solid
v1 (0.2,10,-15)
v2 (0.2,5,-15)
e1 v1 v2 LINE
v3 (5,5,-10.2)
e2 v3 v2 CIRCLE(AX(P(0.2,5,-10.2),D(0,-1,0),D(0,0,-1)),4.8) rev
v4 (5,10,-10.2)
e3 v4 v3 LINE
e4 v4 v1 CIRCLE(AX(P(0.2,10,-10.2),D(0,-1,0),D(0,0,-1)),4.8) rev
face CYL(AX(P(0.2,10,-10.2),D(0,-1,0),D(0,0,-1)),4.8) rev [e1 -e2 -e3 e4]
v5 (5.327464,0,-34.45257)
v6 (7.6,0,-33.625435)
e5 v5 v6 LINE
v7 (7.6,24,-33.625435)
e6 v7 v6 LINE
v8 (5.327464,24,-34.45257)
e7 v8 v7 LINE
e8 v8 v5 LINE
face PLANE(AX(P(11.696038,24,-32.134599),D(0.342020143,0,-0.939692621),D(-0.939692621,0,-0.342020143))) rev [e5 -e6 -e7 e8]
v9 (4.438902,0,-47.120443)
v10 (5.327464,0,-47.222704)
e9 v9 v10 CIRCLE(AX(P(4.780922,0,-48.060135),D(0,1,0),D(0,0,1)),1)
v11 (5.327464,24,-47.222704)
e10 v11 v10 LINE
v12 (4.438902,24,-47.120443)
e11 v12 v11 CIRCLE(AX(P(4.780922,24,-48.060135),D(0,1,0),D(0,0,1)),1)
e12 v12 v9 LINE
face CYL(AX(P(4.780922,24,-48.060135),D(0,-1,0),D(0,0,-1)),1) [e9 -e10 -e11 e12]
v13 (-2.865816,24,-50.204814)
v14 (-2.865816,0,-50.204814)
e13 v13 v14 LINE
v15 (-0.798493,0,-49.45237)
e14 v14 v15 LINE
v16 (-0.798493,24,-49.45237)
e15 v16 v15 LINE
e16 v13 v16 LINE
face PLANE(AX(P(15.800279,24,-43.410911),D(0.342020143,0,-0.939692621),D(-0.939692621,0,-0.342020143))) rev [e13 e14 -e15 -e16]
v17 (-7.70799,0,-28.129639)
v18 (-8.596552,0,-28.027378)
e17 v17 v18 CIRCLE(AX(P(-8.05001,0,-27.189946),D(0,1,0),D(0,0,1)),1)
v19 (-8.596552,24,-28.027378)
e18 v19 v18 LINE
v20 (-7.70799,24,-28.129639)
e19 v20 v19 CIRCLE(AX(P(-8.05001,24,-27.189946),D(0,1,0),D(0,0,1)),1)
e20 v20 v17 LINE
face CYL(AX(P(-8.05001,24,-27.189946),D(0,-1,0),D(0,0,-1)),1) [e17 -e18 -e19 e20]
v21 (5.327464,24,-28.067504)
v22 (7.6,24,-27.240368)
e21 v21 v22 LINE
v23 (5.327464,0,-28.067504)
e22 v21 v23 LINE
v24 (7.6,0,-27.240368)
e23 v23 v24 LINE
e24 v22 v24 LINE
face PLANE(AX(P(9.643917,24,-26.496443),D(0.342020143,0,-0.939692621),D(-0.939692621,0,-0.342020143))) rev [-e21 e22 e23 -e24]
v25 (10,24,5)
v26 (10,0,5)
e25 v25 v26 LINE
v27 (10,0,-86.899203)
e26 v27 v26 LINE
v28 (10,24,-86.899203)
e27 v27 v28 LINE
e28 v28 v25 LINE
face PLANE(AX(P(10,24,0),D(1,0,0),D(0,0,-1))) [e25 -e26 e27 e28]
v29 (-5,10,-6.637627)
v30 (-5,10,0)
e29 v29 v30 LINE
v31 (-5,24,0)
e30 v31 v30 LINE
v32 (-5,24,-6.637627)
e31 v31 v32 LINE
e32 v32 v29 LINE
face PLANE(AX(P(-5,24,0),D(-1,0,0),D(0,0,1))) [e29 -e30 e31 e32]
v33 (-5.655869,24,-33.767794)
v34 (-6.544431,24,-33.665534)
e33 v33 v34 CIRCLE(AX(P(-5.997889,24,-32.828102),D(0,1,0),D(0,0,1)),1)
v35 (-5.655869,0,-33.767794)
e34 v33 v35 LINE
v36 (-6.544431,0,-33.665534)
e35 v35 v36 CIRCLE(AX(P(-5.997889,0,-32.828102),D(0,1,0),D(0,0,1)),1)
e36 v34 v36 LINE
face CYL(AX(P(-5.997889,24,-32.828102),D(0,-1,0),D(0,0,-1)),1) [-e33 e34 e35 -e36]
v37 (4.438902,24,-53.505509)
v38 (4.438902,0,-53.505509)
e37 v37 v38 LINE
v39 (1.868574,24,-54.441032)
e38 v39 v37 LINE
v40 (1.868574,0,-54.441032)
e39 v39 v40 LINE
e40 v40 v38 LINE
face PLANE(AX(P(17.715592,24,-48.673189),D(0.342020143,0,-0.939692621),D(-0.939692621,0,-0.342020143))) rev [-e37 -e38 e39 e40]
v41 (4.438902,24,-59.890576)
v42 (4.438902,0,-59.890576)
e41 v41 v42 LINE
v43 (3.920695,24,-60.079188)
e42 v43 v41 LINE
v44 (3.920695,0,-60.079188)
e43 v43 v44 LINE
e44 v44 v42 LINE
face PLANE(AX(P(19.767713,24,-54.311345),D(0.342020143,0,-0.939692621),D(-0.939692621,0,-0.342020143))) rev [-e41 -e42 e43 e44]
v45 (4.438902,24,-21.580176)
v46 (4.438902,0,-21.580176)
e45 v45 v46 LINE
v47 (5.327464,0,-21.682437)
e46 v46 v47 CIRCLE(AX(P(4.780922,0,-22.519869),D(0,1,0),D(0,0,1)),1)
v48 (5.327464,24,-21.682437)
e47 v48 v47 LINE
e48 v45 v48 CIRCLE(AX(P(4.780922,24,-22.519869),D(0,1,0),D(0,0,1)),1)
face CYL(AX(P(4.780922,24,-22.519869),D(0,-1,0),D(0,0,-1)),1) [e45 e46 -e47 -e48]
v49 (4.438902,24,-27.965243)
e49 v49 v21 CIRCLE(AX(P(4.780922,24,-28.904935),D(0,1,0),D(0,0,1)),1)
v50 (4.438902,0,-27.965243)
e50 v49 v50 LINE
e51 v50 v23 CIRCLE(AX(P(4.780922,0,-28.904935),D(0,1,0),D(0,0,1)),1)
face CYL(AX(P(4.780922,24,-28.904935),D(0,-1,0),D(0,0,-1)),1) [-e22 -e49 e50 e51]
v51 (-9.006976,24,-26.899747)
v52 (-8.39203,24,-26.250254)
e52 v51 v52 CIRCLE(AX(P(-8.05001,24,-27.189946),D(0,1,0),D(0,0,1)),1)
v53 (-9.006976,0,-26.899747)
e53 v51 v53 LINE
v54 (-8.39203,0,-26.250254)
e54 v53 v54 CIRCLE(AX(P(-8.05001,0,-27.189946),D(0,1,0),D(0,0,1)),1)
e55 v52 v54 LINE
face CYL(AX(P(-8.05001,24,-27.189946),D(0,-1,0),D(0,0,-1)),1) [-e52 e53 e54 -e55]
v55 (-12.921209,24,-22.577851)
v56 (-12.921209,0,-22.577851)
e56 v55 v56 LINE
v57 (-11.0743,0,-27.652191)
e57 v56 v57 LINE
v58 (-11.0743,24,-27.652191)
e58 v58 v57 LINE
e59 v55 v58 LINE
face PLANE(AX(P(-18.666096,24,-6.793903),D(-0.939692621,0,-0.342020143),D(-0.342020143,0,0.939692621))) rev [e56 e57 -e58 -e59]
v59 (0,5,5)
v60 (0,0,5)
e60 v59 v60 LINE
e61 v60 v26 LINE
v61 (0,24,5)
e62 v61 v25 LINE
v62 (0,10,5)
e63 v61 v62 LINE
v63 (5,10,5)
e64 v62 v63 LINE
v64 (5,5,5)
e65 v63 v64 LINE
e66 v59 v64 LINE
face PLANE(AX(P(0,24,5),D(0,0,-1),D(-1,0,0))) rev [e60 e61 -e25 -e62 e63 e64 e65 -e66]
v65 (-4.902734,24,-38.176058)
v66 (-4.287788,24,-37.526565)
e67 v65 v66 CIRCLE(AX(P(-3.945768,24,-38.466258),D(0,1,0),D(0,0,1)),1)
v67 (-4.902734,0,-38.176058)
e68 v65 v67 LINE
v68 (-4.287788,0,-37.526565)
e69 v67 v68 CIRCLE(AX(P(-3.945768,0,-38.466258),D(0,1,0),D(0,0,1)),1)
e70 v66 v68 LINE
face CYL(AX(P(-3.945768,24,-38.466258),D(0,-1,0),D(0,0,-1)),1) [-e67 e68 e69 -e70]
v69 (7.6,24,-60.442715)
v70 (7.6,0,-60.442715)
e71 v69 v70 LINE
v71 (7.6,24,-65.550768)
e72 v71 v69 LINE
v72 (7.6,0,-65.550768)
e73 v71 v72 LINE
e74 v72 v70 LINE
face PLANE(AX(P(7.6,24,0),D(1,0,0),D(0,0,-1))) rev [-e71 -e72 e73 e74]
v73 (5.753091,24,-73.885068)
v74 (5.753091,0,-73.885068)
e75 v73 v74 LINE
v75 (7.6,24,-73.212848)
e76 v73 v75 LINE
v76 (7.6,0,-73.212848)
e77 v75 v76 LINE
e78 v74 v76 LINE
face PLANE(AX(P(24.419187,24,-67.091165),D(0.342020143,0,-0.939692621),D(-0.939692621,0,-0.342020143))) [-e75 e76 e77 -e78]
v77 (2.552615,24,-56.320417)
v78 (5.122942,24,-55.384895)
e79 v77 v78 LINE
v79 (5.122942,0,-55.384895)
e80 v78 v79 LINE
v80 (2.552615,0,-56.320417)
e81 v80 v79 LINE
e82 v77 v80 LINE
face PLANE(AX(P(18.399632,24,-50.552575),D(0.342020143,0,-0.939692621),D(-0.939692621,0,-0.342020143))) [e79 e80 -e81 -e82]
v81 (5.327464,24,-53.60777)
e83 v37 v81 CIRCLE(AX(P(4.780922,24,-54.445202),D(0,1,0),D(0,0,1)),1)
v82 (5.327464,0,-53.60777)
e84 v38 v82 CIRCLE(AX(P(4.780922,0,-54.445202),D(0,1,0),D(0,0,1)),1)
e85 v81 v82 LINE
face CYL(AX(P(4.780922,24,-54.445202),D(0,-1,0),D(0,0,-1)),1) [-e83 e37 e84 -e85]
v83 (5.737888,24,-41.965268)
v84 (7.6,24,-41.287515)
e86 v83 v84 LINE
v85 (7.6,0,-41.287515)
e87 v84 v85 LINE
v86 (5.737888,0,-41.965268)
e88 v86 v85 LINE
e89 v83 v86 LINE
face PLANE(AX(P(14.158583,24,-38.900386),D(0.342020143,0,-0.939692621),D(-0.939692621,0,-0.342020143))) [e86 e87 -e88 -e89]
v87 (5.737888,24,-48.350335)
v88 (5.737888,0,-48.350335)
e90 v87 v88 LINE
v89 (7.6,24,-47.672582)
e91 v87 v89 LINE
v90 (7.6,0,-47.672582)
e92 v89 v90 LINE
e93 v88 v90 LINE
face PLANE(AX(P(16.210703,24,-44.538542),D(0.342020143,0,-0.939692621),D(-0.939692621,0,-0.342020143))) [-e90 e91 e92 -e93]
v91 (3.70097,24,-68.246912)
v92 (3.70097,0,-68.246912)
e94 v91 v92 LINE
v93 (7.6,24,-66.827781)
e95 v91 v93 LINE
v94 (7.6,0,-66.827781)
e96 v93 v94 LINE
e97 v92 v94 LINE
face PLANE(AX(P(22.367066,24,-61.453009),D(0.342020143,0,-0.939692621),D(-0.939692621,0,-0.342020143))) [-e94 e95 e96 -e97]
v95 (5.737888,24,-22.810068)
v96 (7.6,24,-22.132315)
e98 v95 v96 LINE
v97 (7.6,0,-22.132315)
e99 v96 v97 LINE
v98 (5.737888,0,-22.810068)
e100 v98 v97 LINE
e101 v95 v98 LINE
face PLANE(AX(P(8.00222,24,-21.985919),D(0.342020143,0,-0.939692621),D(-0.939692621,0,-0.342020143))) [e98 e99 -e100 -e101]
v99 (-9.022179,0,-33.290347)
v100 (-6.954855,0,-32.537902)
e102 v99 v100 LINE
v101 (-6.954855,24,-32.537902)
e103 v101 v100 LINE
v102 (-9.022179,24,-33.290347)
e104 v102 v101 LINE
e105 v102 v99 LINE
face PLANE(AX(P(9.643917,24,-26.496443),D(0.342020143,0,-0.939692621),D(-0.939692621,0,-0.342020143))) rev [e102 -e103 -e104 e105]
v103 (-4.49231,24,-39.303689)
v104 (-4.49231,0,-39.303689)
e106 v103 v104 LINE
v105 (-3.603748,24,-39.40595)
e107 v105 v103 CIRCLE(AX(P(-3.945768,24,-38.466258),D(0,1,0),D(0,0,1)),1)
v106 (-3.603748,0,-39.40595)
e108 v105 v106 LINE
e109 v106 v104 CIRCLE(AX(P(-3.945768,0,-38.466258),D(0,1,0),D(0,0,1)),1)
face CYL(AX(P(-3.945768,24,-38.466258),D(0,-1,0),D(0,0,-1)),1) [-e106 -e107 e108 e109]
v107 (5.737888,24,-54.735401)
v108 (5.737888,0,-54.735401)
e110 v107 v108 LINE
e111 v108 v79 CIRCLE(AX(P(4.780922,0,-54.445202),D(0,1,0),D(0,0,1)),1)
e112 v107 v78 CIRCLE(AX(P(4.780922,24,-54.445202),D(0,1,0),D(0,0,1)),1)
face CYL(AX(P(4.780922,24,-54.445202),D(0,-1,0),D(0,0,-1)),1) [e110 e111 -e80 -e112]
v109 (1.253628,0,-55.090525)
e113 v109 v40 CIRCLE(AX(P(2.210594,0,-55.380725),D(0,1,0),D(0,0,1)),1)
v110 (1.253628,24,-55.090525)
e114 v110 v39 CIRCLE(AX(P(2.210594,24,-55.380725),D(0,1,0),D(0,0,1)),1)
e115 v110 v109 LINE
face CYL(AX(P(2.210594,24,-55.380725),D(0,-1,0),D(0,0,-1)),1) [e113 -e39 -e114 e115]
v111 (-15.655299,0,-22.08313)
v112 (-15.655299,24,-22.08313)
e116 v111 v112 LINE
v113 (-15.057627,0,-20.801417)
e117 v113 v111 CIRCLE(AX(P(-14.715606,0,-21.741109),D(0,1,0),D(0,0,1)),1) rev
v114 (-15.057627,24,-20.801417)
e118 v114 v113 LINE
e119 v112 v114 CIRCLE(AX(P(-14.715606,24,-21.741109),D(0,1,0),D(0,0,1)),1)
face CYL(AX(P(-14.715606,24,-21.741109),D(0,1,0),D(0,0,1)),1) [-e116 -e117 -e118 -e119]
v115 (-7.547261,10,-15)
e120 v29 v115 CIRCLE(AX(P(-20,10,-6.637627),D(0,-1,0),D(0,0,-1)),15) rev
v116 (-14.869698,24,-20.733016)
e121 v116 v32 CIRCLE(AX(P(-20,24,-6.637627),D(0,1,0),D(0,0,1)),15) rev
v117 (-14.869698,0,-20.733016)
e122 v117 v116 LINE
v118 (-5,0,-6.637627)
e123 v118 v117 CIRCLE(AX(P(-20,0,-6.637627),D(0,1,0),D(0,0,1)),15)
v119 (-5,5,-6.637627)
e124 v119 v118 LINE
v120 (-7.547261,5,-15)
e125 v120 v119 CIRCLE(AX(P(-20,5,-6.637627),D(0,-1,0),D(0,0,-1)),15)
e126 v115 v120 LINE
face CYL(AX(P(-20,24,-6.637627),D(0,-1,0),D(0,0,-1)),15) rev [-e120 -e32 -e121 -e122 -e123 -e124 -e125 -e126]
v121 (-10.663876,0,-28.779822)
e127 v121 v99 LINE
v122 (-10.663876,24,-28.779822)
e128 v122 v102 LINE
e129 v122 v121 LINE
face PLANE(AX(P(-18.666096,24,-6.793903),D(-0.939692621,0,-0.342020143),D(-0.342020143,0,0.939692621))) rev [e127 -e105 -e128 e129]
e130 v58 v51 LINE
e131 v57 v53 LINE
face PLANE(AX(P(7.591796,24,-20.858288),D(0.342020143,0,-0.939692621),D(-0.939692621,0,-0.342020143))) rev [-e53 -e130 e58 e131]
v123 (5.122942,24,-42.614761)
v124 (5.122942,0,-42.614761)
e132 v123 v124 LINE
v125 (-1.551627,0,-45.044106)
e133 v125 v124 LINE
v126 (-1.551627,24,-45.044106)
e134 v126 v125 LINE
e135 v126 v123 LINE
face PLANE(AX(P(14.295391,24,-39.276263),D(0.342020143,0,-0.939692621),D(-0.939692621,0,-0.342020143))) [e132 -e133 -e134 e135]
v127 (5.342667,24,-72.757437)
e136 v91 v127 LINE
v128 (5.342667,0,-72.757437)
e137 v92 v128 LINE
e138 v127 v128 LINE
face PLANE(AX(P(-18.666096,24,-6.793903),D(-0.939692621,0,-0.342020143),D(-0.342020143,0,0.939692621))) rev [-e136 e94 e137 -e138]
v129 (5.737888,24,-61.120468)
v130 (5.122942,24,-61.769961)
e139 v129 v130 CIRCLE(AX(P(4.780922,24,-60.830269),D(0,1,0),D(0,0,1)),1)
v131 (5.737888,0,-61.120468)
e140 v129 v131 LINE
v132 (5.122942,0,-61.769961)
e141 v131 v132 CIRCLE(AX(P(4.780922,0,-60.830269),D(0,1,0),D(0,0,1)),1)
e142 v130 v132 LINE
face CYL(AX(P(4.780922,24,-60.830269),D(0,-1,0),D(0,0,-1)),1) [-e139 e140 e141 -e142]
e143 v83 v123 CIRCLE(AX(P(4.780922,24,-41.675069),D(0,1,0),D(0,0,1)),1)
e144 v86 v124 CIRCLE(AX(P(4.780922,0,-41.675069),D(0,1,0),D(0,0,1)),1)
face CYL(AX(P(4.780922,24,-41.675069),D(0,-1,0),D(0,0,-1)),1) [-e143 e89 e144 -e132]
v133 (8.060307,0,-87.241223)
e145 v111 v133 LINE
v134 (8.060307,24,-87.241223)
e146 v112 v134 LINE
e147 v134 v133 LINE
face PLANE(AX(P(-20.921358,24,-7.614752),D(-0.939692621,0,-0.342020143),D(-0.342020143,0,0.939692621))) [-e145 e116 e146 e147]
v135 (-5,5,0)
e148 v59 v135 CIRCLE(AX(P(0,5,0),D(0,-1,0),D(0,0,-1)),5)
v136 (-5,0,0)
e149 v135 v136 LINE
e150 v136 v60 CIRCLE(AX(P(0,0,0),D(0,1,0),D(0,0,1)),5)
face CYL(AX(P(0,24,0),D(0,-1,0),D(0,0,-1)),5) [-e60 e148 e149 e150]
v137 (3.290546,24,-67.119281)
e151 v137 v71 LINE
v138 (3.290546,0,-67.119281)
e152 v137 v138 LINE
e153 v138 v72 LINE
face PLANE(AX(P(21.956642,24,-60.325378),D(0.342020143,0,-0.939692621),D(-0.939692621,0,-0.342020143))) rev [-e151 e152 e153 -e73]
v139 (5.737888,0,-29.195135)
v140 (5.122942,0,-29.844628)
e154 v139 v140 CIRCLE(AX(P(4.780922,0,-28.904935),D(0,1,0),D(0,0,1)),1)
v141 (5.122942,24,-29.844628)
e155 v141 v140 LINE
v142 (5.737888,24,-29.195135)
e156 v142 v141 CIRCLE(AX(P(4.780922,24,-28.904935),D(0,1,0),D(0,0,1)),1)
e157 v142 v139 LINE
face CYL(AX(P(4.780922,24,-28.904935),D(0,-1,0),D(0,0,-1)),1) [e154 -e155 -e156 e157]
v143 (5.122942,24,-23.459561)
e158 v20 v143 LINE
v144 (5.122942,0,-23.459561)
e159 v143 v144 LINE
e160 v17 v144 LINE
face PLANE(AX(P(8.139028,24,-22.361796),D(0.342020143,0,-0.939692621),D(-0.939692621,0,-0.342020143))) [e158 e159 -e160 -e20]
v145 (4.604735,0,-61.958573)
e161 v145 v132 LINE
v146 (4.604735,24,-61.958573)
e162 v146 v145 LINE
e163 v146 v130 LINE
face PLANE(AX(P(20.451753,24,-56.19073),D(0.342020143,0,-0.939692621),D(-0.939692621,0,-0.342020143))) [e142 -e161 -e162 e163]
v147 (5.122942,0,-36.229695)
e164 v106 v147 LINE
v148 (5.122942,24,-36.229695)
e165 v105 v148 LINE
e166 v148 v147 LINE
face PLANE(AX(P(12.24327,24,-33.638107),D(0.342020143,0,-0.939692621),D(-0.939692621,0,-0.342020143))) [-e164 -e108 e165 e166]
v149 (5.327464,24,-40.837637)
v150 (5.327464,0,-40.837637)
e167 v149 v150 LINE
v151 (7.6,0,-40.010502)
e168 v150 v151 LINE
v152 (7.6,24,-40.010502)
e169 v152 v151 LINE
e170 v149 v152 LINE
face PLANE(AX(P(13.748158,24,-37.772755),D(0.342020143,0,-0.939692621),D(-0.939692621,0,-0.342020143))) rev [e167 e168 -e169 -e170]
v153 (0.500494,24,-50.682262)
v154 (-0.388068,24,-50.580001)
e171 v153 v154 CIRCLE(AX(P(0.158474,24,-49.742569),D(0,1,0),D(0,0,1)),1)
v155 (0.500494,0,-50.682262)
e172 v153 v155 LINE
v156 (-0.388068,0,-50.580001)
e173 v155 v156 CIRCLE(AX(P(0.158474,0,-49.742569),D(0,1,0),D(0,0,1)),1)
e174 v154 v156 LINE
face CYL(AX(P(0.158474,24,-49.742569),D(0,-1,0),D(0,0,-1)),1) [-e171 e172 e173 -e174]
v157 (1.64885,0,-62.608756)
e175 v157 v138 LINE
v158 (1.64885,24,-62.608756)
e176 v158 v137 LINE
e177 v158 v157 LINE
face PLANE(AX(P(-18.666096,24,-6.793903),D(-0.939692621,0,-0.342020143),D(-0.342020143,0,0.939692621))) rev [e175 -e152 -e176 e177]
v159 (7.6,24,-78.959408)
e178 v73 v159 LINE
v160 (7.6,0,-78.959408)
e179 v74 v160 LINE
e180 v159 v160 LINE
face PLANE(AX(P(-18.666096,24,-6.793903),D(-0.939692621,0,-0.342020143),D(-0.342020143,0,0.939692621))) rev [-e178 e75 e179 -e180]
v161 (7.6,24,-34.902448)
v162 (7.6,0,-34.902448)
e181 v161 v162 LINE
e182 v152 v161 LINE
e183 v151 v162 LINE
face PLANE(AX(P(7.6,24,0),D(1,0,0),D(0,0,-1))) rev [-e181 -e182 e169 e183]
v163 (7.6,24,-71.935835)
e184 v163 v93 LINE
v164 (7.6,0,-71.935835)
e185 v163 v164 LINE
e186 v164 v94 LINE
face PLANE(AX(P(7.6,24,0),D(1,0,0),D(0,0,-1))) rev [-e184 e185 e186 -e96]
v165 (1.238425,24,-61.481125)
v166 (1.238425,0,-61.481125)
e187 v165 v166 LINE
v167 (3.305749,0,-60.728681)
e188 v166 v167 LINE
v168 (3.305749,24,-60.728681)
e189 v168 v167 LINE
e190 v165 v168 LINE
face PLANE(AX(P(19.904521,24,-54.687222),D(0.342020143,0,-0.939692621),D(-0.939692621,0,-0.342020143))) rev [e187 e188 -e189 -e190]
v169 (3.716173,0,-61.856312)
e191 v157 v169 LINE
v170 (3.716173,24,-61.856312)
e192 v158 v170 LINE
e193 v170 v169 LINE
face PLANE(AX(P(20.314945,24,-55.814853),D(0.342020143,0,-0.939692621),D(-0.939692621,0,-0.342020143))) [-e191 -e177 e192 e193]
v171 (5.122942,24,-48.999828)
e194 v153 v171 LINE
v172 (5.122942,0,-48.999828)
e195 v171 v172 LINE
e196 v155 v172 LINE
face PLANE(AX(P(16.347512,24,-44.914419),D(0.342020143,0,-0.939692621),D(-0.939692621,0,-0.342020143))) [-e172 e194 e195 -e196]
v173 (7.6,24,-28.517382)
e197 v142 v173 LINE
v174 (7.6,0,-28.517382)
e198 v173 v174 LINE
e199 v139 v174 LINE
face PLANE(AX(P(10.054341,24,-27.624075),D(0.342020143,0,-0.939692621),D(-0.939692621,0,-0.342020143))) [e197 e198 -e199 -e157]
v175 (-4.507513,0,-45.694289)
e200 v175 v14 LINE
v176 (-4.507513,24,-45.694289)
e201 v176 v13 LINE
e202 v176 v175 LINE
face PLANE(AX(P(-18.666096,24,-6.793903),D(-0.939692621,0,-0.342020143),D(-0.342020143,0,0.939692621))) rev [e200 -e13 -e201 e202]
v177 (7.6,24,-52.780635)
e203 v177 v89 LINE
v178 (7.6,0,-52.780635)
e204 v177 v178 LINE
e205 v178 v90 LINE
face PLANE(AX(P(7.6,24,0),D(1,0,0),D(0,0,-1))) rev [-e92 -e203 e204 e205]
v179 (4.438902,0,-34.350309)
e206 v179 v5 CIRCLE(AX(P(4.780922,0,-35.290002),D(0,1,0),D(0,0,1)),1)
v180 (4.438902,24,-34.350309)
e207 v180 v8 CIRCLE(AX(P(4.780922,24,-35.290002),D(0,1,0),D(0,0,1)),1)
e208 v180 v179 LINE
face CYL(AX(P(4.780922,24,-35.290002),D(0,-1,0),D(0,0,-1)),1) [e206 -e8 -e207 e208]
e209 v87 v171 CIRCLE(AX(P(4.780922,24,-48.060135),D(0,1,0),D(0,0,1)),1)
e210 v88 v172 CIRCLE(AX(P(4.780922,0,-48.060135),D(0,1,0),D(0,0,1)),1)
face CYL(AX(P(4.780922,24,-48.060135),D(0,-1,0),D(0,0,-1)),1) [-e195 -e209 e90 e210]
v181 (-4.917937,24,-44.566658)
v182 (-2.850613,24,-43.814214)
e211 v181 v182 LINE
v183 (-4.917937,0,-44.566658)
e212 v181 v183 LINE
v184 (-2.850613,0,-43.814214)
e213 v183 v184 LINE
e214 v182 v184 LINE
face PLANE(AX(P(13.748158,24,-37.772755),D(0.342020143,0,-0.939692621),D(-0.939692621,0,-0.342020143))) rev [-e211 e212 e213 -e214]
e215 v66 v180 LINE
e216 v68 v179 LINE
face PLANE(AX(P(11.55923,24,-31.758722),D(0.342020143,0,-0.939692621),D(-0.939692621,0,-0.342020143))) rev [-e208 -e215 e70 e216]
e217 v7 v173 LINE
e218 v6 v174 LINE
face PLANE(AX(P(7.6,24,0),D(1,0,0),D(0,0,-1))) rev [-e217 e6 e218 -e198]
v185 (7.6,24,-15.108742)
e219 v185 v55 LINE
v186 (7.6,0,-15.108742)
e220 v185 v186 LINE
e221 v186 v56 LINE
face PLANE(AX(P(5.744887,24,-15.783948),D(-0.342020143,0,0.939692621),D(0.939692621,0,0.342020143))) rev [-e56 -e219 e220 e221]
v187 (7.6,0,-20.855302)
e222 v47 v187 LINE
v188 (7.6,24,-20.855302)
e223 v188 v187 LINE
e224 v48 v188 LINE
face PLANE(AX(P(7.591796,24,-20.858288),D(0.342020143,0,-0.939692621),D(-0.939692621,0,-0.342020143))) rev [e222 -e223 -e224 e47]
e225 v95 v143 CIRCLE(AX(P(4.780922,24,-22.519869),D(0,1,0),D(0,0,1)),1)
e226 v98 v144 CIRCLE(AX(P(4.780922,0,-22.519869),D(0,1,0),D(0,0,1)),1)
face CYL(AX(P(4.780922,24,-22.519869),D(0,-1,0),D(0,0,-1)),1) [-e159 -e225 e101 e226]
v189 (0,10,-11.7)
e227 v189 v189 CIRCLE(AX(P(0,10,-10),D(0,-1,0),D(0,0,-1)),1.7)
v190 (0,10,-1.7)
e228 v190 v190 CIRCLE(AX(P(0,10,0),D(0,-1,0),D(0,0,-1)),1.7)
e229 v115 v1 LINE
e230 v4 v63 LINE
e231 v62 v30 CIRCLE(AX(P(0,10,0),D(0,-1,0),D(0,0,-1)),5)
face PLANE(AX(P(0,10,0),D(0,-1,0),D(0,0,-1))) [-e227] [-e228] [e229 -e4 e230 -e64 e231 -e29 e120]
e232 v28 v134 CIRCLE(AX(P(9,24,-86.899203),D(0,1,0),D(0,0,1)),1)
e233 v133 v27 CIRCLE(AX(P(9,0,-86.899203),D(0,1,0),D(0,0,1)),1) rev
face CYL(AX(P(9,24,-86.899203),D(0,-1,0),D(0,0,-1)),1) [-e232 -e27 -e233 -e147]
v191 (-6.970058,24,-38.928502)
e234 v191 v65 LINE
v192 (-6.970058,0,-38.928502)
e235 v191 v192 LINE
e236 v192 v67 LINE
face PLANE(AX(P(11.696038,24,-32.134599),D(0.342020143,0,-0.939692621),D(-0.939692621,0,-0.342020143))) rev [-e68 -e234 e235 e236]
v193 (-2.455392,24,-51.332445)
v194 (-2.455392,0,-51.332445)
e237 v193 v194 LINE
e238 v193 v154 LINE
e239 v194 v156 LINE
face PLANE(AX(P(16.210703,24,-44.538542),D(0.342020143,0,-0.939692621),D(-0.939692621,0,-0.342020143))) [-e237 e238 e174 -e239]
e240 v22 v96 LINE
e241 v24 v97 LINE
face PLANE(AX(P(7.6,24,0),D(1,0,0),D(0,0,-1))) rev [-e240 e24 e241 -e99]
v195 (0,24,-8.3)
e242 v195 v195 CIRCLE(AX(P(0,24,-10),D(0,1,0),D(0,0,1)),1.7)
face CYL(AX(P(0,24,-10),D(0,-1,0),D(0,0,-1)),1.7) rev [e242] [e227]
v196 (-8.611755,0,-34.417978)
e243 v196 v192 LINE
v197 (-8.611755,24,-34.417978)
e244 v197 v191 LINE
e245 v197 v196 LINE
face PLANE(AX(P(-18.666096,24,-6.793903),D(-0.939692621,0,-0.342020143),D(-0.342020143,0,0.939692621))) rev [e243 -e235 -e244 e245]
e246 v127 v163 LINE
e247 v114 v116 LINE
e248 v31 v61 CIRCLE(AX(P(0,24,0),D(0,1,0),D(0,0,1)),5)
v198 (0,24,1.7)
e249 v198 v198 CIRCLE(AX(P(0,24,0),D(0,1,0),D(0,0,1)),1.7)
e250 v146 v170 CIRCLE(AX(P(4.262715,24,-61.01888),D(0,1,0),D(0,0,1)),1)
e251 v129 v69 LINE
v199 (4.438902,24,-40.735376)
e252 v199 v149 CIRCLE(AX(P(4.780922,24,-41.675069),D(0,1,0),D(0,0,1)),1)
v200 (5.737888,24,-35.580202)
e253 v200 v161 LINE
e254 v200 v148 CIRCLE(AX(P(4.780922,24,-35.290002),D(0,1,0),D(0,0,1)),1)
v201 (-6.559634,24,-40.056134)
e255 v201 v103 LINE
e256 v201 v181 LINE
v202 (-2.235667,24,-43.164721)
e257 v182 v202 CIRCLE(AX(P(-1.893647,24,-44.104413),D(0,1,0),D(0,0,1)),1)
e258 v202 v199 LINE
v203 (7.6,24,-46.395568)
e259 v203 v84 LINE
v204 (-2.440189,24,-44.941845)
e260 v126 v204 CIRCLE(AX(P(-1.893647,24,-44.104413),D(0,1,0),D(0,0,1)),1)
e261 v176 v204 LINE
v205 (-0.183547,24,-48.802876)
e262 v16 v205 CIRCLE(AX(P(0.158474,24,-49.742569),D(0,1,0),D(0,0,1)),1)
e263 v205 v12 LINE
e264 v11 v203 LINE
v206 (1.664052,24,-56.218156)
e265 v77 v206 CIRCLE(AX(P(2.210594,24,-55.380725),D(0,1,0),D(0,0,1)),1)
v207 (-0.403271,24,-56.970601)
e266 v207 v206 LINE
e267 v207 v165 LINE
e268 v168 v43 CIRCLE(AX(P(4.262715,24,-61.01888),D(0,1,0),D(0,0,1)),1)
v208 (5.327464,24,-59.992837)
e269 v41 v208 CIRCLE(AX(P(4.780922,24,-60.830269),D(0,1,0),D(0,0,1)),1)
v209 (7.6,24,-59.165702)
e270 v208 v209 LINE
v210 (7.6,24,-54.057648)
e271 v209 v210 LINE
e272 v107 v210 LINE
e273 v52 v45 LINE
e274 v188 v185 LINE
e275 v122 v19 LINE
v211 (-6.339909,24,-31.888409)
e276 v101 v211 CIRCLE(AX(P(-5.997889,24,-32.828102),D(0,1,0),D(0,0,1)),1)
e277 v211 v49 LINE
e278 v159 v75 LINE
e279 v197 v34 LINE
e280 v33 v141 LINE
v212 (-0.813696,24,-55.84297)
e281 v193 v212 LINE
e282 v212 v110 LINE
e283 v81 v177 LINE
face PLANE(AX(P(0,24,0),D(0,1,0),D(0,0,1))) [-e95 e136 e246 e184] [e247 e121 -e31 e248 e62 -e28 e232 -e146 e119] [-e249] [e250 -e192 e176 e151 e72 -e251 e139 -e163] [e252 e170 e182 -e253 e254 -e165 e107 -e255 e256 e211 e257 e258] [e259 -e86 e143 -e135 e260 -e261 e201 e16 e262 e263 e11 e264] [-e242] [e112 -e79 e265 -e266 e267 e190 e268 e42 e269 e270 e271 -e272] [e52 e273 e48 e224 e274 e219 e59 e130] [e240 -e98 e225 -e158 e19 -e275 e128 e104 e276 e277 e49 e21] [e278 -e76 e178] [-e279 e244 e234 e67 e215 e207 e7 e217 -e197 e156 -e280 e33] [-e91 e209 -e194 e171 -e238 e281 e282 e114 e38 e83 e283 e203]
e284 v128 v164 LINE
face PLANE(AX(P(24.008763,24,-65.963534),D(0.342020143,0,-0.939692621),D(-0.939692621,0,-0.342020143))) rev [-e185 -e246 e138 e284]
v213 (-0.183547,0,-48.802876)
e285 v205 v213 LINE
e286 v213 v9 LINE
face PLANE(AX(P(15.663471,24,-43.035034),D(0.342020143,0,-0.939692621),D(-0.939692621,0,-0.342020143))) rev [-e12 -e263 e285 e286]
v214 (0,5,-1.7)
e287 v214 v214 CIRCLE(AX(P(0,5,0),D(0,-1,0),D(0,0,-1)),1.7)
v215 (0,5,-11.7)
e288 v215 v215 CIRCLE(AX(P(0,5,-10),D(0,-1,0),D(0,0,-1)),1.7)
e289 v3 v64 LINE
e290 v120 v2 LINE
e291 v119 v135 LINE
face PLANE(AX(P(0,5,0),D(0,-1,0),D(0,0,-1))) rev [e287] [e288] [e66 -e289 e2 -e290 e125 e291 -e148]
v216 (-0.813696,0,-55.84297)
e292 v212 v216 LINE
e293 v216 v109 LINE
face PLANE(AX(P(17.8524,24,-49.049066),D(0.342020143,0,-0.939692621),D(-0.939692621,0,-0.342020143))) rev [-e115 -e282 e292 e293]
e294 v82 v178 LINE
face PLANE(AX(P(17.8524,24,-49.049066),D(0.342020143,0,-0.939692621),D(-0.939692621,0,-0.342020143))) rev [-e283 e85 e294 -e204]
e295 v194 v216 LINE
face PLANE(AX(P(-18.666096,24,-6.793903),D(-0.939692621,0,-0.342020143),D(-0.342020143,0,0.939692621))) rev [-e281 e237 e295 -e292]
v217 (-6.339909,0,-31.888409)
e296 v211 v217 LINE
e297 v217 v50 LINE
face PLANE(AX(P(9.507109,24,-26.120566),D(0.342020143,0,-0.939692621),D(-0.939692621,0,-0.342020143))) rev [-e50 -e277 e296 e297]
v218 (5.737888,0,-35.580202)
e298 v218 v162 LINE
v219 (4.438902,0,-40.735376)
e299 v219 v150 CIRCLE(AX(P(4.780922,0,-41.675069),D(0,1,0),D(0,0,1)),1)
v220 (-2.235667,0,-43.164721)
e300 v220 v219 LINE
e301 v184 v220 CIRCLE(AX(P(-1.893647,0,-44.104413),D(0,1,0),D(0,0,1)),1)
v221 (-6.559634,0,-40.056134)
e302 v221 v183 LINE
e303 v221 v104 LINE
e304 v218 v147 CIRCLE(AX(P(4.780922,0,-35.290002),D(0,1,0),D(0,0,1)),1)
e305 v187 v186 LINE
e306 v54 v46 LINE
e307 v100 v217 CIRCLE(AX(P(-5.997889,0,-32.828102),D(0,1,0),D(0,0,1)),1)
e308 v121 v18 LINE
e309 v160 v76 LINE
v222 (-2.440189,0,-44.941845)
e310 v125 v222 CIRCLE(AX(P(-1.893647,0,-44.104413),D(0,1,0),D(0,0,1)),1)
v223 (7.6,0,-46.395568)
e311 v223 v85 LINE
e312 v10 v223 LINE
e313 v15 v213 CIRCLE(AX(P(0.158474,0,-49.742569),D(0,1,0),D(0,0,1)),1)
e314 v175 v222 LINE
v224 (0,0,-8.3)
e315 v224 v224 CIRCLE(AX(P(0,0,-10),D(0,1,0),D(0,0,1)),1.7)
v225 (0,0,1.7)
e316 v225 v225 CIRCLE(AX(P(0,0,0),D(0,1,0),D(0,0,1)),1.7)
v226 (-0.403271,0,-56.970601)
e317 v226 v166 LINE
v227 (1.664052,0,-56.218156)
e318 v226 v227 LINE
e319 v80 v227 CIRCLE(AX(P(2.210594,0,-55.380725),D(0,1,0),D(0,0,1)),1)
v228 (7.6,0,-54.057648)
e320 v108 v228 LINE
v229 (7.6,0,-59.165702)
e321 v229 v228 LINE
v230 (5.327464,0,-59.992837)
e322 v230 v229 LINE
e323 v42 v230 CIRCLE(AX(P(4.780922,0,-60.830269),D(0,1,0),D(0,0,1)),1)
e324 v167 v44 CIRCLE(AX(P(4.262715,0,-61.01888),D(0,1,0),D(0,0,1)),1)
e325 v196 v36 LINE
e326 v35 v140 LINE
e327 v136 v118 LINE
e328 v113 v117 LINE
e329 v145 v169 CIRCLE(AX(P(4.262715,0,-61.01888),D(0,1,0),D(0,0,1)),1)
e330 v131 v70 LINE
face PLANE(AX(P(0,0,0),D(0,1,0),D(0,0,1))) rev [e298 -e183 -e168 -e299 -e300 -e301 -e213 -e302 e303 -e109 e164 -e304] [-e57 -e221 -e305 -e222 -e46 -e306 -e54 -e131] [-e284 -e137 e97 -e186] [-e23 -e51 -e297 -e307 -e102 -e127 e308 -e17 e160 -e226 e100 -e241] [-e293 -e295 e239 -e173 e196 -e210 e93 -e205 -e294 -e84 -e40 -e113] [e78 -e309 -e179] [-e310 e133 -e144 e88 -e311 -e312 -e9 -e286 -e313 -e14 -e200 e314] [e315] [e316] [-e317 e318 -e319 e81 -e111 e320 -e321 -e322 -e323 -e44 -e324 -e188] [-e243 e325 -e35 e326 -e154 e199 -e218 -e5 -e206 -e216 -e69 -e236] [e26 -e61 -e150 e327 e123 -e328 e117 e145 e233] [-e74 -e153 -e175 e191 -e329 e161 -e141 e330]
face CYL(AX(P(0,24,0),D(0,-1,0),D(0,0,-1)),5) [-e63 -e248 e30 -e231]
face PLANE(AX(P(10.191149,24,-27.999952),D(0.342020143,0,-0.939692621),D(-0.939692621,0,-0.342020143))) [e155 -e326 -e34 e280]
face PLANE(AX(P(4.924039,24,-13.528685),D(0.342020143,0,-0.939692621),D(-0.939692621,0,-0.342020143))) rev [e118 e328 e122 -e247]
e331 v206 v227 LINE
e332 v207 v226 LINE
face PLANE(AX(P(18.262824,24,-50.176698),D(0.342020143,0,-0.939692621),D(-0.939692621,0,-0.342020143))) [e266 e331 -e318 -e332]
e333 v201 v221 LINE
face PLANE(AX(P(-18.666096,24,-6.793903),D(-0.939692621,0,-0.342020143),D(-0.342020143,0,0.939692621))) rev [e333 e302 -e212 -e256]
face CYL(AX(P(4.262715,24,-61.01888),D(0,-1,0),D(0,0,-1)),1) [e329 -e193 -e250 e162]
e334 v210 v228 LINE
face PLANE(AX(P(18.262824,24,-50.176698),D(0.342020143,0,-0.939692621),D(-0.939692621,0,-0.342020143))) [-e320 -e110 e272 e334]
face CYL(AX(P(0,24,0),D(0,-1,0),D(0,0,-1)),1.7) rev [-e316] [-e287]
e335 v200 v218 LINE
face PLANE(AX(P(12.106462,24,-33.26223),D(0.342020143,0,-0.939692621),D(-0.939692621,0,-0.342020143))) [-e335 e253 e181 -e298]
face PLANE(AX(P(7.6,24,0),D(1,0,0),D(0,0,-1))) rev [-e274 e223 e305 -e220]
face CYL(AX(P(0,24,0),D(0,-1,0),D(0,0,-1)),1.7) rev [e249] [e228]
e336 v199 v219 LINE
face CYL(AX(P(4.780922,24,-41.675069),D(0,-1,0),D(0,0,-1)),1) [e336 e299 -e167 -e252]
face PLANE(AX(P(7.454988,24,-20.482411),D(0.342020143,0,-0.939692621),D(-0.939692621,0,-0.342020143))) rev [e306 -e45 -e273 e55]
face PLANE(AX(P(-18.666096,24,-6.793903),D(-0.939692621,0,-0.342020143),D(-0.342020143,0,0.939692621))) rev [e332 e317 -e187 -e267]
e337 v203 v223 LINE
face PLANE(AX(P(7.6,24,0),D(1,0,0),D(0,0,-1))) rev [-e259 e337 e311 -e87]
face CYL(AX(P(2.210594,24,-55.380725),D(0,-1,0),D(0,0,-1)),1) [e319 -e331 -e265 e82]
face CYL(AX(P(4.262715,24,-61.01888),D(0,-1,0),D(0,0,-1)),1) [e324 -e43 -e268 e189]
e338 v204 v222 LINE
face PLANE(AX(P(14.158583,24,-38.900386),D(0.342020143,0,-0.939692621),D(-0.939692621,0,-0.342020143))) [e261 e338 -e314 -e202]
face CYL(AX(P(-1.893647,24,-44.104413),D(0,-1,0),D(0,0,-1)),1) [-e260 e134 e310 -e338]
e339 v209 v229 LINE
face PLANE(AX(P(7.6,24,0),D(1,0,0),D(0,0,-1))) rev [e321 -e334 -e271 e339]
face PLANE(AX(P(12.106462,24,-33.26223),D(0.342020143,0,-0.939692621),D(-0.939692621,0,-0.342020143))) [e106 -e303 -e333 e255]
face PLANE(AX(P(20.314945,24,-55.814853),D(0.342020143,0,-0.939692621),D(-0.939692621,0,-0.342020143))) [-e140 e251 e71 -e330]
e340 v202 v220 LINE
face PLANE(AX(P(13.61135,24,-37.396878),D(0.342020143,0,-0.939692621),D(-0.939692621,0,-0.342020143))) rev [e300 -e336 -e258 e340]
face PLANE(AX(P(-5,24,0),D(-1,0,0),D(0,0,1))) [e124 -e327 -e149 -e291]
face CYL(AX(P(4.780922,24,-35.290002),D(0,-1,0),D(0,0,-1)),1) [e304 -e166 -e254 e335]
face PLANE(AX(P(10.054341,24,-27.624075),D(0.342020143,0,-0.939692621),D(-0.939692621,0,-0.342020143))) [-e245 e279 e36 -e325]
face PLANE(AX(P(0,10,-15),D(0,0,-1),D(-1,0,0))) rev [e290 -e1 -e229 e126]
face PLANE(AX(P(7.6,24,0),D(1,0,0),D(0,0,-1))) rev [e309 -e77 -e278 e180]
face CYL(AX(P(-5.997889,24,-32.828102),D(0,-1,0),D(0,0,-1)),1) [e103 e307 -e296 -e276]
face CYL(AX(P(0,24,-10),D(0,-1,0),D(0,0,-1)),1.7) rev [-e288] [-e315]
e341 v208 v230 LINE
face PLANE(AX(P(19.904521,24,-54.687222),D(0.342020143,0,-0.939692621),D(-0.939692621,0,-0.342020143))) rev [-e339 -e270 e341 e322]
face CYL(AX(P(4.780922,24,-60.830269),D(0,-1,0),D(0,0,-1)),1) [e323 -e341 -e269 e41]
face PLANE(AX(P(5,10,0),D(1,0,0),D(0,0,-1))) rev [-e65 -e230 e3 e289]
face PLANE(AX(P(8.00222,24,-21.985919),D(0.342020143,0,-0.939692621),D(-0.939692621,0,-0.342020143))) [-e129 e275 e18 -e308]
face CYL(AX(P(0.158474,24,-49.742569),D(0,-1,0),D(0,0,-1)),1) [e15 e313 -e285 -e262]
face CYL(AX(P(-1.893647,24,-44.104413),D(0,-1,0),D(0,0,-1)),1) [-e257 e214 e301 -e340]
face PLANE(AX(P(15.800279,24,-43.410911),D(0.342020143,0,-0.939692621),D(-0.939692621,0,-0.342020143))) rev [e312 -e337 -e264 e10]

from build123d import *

# Parameters (mm, degrees)
SKETCH_1_R          = 1.7
EXTRUDE_1_DEPTH     = 24
CUT_EXTRUDE_START   = -5
SKETCH_2_R          = 1.7
CUT_EXTRUDE_1_DEPTH = 5
FILLET_1_R          = 1
FILLET_2_R          = 15


with BuildPart() as part:
    # 草图1 → 凸台-拉伸1 (new body)
    with BuildSketch(Plane(origin=(0, 0, 0), x_dir=(1, 0, 0), z_dir=(0, 1, 0))):
        with BuildLine():
            Line((-5, 17.140740034), (-5, 0))
            ThreePointArc((-5, 0), (-3.535533906, -3.535533906), (0, -5))
            Line((0, -5), (10, -5))
            Line((10, -5), (10, 92.570484452))
            Line((10, 92.570484452), (-15.997319233, 21.143436891))
            Line((-15.997319233, 21.143436891), (-5, 17.140740034))
        make_face()
        with Locations(Location((0, 0, 0), (0, 0, 270))):
            Circle(SKETCH_1_R, mode=Mode.SUBTRACT)
        with Locations(Location((0, 10, 0), (0, 0, 270))):
            Circle(SKETCH_1_R, mode=Mode.SUBTRACT)
        with BuildLine():
            Line((7.6, 15.108741736), (-12.9212086, 22.577850837))
            Line((-12.9212086, 22.577850837), (-11.074299826, 27.65219099))
            Line((-11.074299826, 27.65219099), (-9.00697606, 26.899746674))
            ThreePointArc((-9.00697606, 26.899746674), (-8.776165309, 26.502415559), (-8.392030021, 26.250253511))
            Line((-8.392030021, 26.250253511), (4.438901994, 21.58017618))
            ThreePointArc((4.438901994, 21.58017618), (4.895253337, 21.526426111), (5.327464148, 21.682437114))
            Line((5.327464148, 21.682437114), (7.6, 20.855301707))
            Line((7.6, 20.855301707), (7.6, 15.108741736))
        make_face(mode=Mode.SUBTRACT)
        with BuildLine():
            ThreePointArc((5.73788832, 22.810068259), (5.507077569, 23.207399374), (5.122942281, 23.459561422))
            Line((5.122942281, 23.459561422), (-7.707989734, 28.129638753))
            ThreePointArc((-7.707989734, 28.129638753), (-8.164341077, 28.183388821), (-8.596551888, 28.027377819))
            Line((-8.596551888, 28.027377819), (-10.663875654, 28.779822134))
            Line((-10.663875654, 28.779822134), (-9.022178966, 33.290346714))
            Line((-9.022178966, 33.290346714), (-6.9548552, 32.537902399))
            ThreePointArc((-6.9548552, 32.537902399), (-6.724044449, 32.140571284), (-6.339909161, 31.888409236))
            Line((-6.339909161, 31.888409236), (4.438901994, 27.965242815))
            ThreePointArc((4.438901994, 27.965242815), (4.895253337, 27.911492746), (5.327464148, 28.067503748))
            Line((5.327464148, 28.067503748), (7.6, 27.240368342))
            Line((7.6, 27.240368342), (7.6, 22.132315034))
            Line((7.6, 22.132315034), (5.73788832, 22.810068259))
        make_face(mode=Mode.SUBTRACT)
        with BuildLine():
            ThreePointArc((5.73788832, 29.195134893), (5.507077569, 29.592466009), (5.122942281, 29.844628056))
            Line((5.122942281, 29.844628056), (-5.655868874, 33.767794478))
            ThreePointArc((-5.655868874, 33.767794478), (-6.112220217, 33.821544546), (-6.544431028, 33.665533544))
            Line((-6.544431028, 33.665533544), (-8.611754794, 34.417977859))
            Line((-8.611754794, 34.417977859), (-6.970058106, 38.928502439))
            Line((-6.970058106, 38.928502439), (-4.90273434, 38.176058124))
            ThreePointArc((-4.90273434, 38.176058124), (-4.671923589, 37.778727008), (-4.287788301, 37.526564961))
            Line((-4.287788301, 37.526564961), (4.438901994, 34.35030945))
            ThreePointArc((4.438901994, 34.35030945), (4.895253337, 34.296559381), (5.327464148, 34.452570383))
            Line((5.327464148, 34.452570383), (7.6, 33.625434977))
            Line((7.6, 33.625434977), (7.6, 28.517381669))
            Line((7.6, 28.517381669), (5.73788832, 29.195134893))
        make_face(mode=Mode.SUBTRACT)
        with BuildLine():
            ThreePointArc((5.73788832, 35.580201528), (5.507077569, 35.977532644), (5.122942281, 36.229694691))
            Line((5.122942281, 36.229694691), (-3.603748014, 39.405950202))
            ThreePointArc((-3.603748014, 39.405950202), (-4.060099357, 39.459700271), (-4.492310168, 39.303689269))
            Line((-4.492310168, 39.303689269), (-6.559633934, 40.056133584))
            Line((-6.559633934, 40.056133584), (-4.917937246, 44.566658164))
            Line((-4.917937246, 44.566658164), (-2.85061348, 43.814213848))
            ThreePointArc((-2.85061348, 43.814213848), (-2.619802729, 43.416882733), (-2.235667441, 43.164720685))
            Line((-2.235667441, 43.164720685), (4.438901994, 40.735376085))
            ThreePointArc((4.438901994, 40.735376085), (4.895253337, 40.681626016), (5.327464148, 40.837637018))
            Line((5.327464148, 40.837637018), (7.6, 40.010501612))
            Line((7.6, 40.010501612), (7.6, 34.902448304))
            Line((7.6, 34.902448304), (5.73788832, 35.580201528))
        make_face(mode=Mode.SUBTRACT)
        with BuildLine():
            ThreePointArc((5.73788832, 41.965268163), (5.507077569, 42.362599278), (5.122942281, 42.614761326))
            Line((5.122942281, 42.614761326), (-1.551627154, 45.044105927))
            ThreePointArc((-1.551627154, 45.044105927), (-2.007978497, 45.097855995), (-2.440189308, 44.941844993))
            Line((-2.440189308, 44.941844993), (-4.507513074, 45.694289309))
            Line((-4.507513074, 45.694289309), (-2.865816386, 50.204813888))
            Line((-2.865816386, 50.204813888), (-0.79849262, 49.452369573))
            ThreePointArc((-0.79849262, 49.452369573), (-0.567681869, 49.055038458), (-0.183546581, 48.80287641))
            Line((-0.183546581, 48.80287641), (4.438901994, 47.120442719))
            ThreePointArc((4.438901994, 47.120442719), (4.895253337, 47.066692651), (5.327464148, 47.222703653))
            Line((5.327464148, 47.222703653), (7.6, 46.395568247))
            Line((7.6, 46.395568247), (7.6, 41.287514939))
            Line((7.6, 41.287514939), (5.73788832, 41.965268163))
        make_face(mode=Mode.SUBTRACT)
        with BuildLine():
            ThreePointArc((5.73788832, 48.350334798), (5.507077569, 48.747665913), (5.122942281, 48.999827961))
            Line((5.122942281, 48.999827961), (0.500493706, 50.682261652))
            ThreePointArc((0.500493706, 50.682261652), (0.044142363, 50.73601172), (-0.388068448, 50.580000718))
            Line((-0.388068448, 50.580000718), (-2.455392214, 51.332445033))
            Line((-2.455392214, 51.332445033), (-0.813695526, 55.842969613))
            Line((-0.813695526, 55.842969613), (1.25362824, 55.090525298))
            ThreePointArc((1.25362824, 55.090525298), (1.484438991, 54.693194182), (1.868574279, 54.441032135))
            Line((1.868574279, 54.441032135), (4.438901994, 53.505509354))
            ThreePointArc((4.438901994, 53.505509354), (4.895253337, 53.451759286), (5.327464148, 53.607770288))
            Line((5.327464148, 53.607770288), (7.6, 52.780634882))
            Line((7.6, 52.780634882), (7.6, 47.672581574))
            Line((7.6, 47.672581574), (5.73788832, 48.350334798))
        make_face(mode=Mode.SUBTRACT)
        with BuildLine():
            ThreePointArc((5.73788832, 54.735401433), (5.507077569, 55.132732548), (5.122942281, 55.384894596))
            Line((5.122942281, 55.384894596), (2.552614566, 56.320417376))
            ThreePointArc((2.552614566, 56.320417376), (2.096263223, 56.374167445), (1.664052412, 56.218156443))
            Line((1.664052412, 56.218156443), (-0.403271354, 56.970600758))
            Line((-0.403271354, 56.970600758), (1.238425334, 61.481125338))
            Line((1.238425334, 61.481125338), (3.3057491, 60.728681023))
            ThreePointArc((3.3057491, 60.728681023), (3.536559851, 60.331349907), (3.920695139, 60.07918786))
            Line((3.920695139, 60.07918786), (4.438901994, 59.890575989))
            ThreePointArc((4.438901994, 59.890575989), (4.895253337, 59.836825921), (5.327464148, 59.992836923))
            Line((5.327464148, 59.992836923), (7.6, 59.165701516))
            Line((7.6, 59.165701516), (7.6, 54.057648209))
            Line((7.6, 54.057648209), (5.73788832, 54.735401433))
        make_face(mode=Mode.SUBTRACT)
        with BuildLine():
            ThreePointArc((5.73788832, 61.120468068), (5.507077569, 61.517799183), (5.122942281, 61.769961231))
            Line((5.122942281, 61.769961231), (4.604735426, 61.958573101))
            ThreePointArc((4.604735426, 61.958573101), (4.148384083, 62.01232317), (3.716173272, 61.856312167))
            Line((3.716173272, 61.856312167), (1.648849506, 62.608756483))
            Line((1.648849506, 62.608756483), (3.290546194, 67.119281063))
            Line((3.290546194, 67.119281063), (7.6, 65.550768151))
            Line((7.6, 65.550768151), (7.6, 60.442714843))
            Line((7.6, 60.442714843), (5.73788832, 61.120468068))
        make_face(mode=Mode.SUBTRACT)
        Polygon((3.700970366, 68.246912207), (5.342667054, 72.757436787), (7.6, 71.935834786), (7.6, 66.827781478), align=None, mode=Mode.SUBTRACT)
        Polygon((5.753091226, 73.885067932), (7.6, 78.959408084), (7.6, 73.212848113), align=None, mode=Mode.SUBTRACT)
    extrude(amount=EXTRUDE_1_DEPTH)

    # 草图2 → 切除-拉伸1 (cut)
    with BuildSketch(Plane.XZ.offset(CUT_EXTRUDE_START)):
        with BuildLine():
            Line((-5, 5), (-5, -15))
            Line((-5, -15), (0.2, -15))
            ThreePointArc((0.2, -15), (3.59411255, -13.59411255), (5, -10.2))
            Line((5, -10.2), (5, 5))
            Line((5, 5), (-5, 5))
        make_face()
        with Locations(Location((0, -10, 0), (0, 0, 270))):
            Circle(SKETCH_2_R, mode=Mode.SUBTRACT)
        with Locations(Location((0, 0, 0), (0, 0, 270))):
            Circle(SKETCH_2_R, mode=Mode.SUBTRACT)
    extrude(amount=-CUT_EXTRUDE_1_DEPTH, mode=Mode.SUBTRACT)

    # 圆角1
    fillet_1_edges = [part.edges().sort_by_distance(p)[0] for p in [
        (-15.997319233, 12, -21.143436891),
        (10, 12, -92.570484452),
    ]]
    fillet(fillet_1_edges, radius=FILLET_1_R)

    # 圆角2
    # the kernel refuses this fillet: 15 mm, written as the material it adds along each edge
    with BuildSketch(Plane(origin=(-5, 0, -17.140740034), x_dir=(-0.9396926207859102, 0, -0.34202014332566355), z_dir=(0, 1, 0))) as fillet_2_piece_1_section:
        with BuildLine():
            CenterArc((FILLET_2_R * 0.70020753821, FILLET_2_R), FILLET_2_R, 200, 70)
            Line((-FILLET_2_R * 0.239485082576, FILLET_2_R * 0.657979856674), (0, 0))
            Line((0, 0), (FILLET_2_R * 0.70020753821, 0))
        make_face()
    fillet_2_piece_1 = extrude(amount=24, mode=Mode.PRIVATE)
    fillet_2_piece_1 = split(fillet_2_piece_1, bisect_by=Plane(origin=(-8.067749686, 5, -17.400247016), z_dir=(0, -1, 0)), keep=Keep.TOP, mode=Mode.PRIVATE)
    fillet_2_piece_1 = split(fillet_2_piece_1, bisect_by=Plane(origin=(-8.067749686, 2.5, -15), z_dir=(0, 0, -1)), keep=Keep.TOP, mode=Mode.PRIVATE)
    add(fillet_2_piece_1)
    with BuildSketch(Plane(origin=(-5, 0, -17.140740034), x_dir=(-0.9396926207859102, 0, -0.34202014332566355), z_dir=(0, 1, 0))) as fillet_2_piece_2_section:
        with BuildLine():
            CenterArc((FILLET_2_R * 0.70020753821, FILLET_2_R), FILLET_2_R, 200, 70)
            Line((-FILLET_2_R * 0.239485082576, FILLET_2_R * 0.657979856674), (0, 0))
            Line((0, 0), (FILLET_2_R * 0.70020753821, 0))
        make_face()
    fillet_2_piece_2 = extrude(amount=24, mode=Mode.PRIVATE)
    fillet_2_piece_2 = split(fillet_2_piece_2, bisect_by=Plane(origin=(-5.50966696, 5, -12.375604979), z_dir=(0, -1, 0)), keep=Keep.TOP, mode=Mode.PRIVATE)
    fillet_2_piece_2 = split(fillet_2_piece_2, bisect_by=Plane(origin=(-5.50966696, 2.5, -15), z_dir=(0, 0, 1)), keep=Keep.TOP, mode=Mode.PRIVATE)
    add(fillet_2_piece_2)
    with BuildSketch(Plane(origin=(-5, 0, -17.140740034), x_dir=(-0.9396926207859102, 0, -0.34202014332566355), z_dir=(0, 1, 0))) as fillet_2_piece_3_section:
        with BuildLine():
            CenterArc((FILLET_2_R * 0.70020753821, FILLET_2_R), FILLET_2_R, 200, 70)
            Line((-FILLET_2_R * 0.239485082576, FILLET_2_R * 0.657979856674), (0, 0))
            Line((0, 0), (FILLET_2_R * 0.70020753821, 0))
        make_face()
    fillet_2_piece_3 = extrude(amount=24, mode=Mode.PRIVATE)
    fillet_2_piece_3 = split(fillet_2_piece_3, bisect_by=Plane(origin=(-8.067749686, 5, -17.400247016), z_dir=(0, 1, 0)), keep=Keep.TOP, mode=Mode.PRIVATE)
    fillet_2_piece_3 = split(fillet_2_piece_3, bisect_by=Plane(origin=(-8.067749686, 7.5, -15), z_dir=(0, 0, -1)), keep=Keep.TOP, mode=Mode.PRIVATE)
    fillet_2_piece_3 = split(fillet_2_piece_3, bisect_by=Plane(origin=(-8.067749686, 10, -17.400247016), z_dir=(0, -1, 0)), keep=Keep.TOP, mode=Mode.PRIVATE)
    add(fillet_2_piece_3)
    with BuildSketch(Plane(origin=(-5, 0, -17.140740034), x_dir=(-0.9396926207859102, 0, -0.34202014332566355), z_dir=(0, 1, 0))) as fillet_2_piece_4_section:
        with BuildLine():
            CenterArc((FILLET_2_R * 0.70020753821, FILLET_2_R), FILLET_2_R, 200, 70)
            Line((-FILLET_2_R * 0.239485082576, FILLET_2_R * 0.657979856674), (0, 0))
            Line((0, 0), (FILLET_2_R * 0.70020753821, 0))
        make_face()
    fillet_2_piece_4 = extrude(amount=24, mode=Mode.PRIVATE)
    fillet_2_piece_4 = split(fillet_2_piece_4, bisect_by=Plane(origin=(-8.067749686, 17, -15), z_dir=(0, 0, -1)), keep=Keep.TOP, mode=Mode.PRIVATE)
    fillet_2_piece_4 = split(fillet_2_piece_4, bisect_by=Plane(origin=(-8.067749686, 10, -17.400247016), z_dir=(0, 1, 0)), keep=Keep.TOP, mode=Mode.PRIVATE)
    add(fillet_2_piece_4)
    with BuildSketch(Plane(origin=(-5, 0, -17.140740034), x_dir=(-0.9396926207859102, 0, -0.34202014332566355), z_dir=(0, 1, 0))) as fillet_2_piece_5_section:
        with BuildLine():
            CenterArc((FILLET_2_R * 0.70020753821, FILLET_2_R), FILLET_2_R, 200, 70)
            Line((-FILLET_2_R * 0.239485082576, FILLET_2_R * 0.657979856674), (0, 0))
            Line((0, 0), (FILLET_2_R * 0.70020753821, 0))
        make_face()
    fillet_2_piece_5 = extrude(amount=24, mode=Mode.PRIVATE)
    fillet_2_piece_5 = split(fillet_2_piece_5, bisect_by=Plane(origin=(-5.50966696, 17, -15), z_dir=(0, 0, 1)), keep=Keep.TOP, mode=Mode.PRIVATE)
    fillet_2_piece_5 = split(fillet_2_piece_5, bisect_by=Plane(origin=(-5.50966696, 10, -12.375604979), z_dir=(0, 1, 0)), keep=Keep.TOP, mode=Mode.PRIVATE)
    add(fillet_2_piece_5)


solid = part.part
